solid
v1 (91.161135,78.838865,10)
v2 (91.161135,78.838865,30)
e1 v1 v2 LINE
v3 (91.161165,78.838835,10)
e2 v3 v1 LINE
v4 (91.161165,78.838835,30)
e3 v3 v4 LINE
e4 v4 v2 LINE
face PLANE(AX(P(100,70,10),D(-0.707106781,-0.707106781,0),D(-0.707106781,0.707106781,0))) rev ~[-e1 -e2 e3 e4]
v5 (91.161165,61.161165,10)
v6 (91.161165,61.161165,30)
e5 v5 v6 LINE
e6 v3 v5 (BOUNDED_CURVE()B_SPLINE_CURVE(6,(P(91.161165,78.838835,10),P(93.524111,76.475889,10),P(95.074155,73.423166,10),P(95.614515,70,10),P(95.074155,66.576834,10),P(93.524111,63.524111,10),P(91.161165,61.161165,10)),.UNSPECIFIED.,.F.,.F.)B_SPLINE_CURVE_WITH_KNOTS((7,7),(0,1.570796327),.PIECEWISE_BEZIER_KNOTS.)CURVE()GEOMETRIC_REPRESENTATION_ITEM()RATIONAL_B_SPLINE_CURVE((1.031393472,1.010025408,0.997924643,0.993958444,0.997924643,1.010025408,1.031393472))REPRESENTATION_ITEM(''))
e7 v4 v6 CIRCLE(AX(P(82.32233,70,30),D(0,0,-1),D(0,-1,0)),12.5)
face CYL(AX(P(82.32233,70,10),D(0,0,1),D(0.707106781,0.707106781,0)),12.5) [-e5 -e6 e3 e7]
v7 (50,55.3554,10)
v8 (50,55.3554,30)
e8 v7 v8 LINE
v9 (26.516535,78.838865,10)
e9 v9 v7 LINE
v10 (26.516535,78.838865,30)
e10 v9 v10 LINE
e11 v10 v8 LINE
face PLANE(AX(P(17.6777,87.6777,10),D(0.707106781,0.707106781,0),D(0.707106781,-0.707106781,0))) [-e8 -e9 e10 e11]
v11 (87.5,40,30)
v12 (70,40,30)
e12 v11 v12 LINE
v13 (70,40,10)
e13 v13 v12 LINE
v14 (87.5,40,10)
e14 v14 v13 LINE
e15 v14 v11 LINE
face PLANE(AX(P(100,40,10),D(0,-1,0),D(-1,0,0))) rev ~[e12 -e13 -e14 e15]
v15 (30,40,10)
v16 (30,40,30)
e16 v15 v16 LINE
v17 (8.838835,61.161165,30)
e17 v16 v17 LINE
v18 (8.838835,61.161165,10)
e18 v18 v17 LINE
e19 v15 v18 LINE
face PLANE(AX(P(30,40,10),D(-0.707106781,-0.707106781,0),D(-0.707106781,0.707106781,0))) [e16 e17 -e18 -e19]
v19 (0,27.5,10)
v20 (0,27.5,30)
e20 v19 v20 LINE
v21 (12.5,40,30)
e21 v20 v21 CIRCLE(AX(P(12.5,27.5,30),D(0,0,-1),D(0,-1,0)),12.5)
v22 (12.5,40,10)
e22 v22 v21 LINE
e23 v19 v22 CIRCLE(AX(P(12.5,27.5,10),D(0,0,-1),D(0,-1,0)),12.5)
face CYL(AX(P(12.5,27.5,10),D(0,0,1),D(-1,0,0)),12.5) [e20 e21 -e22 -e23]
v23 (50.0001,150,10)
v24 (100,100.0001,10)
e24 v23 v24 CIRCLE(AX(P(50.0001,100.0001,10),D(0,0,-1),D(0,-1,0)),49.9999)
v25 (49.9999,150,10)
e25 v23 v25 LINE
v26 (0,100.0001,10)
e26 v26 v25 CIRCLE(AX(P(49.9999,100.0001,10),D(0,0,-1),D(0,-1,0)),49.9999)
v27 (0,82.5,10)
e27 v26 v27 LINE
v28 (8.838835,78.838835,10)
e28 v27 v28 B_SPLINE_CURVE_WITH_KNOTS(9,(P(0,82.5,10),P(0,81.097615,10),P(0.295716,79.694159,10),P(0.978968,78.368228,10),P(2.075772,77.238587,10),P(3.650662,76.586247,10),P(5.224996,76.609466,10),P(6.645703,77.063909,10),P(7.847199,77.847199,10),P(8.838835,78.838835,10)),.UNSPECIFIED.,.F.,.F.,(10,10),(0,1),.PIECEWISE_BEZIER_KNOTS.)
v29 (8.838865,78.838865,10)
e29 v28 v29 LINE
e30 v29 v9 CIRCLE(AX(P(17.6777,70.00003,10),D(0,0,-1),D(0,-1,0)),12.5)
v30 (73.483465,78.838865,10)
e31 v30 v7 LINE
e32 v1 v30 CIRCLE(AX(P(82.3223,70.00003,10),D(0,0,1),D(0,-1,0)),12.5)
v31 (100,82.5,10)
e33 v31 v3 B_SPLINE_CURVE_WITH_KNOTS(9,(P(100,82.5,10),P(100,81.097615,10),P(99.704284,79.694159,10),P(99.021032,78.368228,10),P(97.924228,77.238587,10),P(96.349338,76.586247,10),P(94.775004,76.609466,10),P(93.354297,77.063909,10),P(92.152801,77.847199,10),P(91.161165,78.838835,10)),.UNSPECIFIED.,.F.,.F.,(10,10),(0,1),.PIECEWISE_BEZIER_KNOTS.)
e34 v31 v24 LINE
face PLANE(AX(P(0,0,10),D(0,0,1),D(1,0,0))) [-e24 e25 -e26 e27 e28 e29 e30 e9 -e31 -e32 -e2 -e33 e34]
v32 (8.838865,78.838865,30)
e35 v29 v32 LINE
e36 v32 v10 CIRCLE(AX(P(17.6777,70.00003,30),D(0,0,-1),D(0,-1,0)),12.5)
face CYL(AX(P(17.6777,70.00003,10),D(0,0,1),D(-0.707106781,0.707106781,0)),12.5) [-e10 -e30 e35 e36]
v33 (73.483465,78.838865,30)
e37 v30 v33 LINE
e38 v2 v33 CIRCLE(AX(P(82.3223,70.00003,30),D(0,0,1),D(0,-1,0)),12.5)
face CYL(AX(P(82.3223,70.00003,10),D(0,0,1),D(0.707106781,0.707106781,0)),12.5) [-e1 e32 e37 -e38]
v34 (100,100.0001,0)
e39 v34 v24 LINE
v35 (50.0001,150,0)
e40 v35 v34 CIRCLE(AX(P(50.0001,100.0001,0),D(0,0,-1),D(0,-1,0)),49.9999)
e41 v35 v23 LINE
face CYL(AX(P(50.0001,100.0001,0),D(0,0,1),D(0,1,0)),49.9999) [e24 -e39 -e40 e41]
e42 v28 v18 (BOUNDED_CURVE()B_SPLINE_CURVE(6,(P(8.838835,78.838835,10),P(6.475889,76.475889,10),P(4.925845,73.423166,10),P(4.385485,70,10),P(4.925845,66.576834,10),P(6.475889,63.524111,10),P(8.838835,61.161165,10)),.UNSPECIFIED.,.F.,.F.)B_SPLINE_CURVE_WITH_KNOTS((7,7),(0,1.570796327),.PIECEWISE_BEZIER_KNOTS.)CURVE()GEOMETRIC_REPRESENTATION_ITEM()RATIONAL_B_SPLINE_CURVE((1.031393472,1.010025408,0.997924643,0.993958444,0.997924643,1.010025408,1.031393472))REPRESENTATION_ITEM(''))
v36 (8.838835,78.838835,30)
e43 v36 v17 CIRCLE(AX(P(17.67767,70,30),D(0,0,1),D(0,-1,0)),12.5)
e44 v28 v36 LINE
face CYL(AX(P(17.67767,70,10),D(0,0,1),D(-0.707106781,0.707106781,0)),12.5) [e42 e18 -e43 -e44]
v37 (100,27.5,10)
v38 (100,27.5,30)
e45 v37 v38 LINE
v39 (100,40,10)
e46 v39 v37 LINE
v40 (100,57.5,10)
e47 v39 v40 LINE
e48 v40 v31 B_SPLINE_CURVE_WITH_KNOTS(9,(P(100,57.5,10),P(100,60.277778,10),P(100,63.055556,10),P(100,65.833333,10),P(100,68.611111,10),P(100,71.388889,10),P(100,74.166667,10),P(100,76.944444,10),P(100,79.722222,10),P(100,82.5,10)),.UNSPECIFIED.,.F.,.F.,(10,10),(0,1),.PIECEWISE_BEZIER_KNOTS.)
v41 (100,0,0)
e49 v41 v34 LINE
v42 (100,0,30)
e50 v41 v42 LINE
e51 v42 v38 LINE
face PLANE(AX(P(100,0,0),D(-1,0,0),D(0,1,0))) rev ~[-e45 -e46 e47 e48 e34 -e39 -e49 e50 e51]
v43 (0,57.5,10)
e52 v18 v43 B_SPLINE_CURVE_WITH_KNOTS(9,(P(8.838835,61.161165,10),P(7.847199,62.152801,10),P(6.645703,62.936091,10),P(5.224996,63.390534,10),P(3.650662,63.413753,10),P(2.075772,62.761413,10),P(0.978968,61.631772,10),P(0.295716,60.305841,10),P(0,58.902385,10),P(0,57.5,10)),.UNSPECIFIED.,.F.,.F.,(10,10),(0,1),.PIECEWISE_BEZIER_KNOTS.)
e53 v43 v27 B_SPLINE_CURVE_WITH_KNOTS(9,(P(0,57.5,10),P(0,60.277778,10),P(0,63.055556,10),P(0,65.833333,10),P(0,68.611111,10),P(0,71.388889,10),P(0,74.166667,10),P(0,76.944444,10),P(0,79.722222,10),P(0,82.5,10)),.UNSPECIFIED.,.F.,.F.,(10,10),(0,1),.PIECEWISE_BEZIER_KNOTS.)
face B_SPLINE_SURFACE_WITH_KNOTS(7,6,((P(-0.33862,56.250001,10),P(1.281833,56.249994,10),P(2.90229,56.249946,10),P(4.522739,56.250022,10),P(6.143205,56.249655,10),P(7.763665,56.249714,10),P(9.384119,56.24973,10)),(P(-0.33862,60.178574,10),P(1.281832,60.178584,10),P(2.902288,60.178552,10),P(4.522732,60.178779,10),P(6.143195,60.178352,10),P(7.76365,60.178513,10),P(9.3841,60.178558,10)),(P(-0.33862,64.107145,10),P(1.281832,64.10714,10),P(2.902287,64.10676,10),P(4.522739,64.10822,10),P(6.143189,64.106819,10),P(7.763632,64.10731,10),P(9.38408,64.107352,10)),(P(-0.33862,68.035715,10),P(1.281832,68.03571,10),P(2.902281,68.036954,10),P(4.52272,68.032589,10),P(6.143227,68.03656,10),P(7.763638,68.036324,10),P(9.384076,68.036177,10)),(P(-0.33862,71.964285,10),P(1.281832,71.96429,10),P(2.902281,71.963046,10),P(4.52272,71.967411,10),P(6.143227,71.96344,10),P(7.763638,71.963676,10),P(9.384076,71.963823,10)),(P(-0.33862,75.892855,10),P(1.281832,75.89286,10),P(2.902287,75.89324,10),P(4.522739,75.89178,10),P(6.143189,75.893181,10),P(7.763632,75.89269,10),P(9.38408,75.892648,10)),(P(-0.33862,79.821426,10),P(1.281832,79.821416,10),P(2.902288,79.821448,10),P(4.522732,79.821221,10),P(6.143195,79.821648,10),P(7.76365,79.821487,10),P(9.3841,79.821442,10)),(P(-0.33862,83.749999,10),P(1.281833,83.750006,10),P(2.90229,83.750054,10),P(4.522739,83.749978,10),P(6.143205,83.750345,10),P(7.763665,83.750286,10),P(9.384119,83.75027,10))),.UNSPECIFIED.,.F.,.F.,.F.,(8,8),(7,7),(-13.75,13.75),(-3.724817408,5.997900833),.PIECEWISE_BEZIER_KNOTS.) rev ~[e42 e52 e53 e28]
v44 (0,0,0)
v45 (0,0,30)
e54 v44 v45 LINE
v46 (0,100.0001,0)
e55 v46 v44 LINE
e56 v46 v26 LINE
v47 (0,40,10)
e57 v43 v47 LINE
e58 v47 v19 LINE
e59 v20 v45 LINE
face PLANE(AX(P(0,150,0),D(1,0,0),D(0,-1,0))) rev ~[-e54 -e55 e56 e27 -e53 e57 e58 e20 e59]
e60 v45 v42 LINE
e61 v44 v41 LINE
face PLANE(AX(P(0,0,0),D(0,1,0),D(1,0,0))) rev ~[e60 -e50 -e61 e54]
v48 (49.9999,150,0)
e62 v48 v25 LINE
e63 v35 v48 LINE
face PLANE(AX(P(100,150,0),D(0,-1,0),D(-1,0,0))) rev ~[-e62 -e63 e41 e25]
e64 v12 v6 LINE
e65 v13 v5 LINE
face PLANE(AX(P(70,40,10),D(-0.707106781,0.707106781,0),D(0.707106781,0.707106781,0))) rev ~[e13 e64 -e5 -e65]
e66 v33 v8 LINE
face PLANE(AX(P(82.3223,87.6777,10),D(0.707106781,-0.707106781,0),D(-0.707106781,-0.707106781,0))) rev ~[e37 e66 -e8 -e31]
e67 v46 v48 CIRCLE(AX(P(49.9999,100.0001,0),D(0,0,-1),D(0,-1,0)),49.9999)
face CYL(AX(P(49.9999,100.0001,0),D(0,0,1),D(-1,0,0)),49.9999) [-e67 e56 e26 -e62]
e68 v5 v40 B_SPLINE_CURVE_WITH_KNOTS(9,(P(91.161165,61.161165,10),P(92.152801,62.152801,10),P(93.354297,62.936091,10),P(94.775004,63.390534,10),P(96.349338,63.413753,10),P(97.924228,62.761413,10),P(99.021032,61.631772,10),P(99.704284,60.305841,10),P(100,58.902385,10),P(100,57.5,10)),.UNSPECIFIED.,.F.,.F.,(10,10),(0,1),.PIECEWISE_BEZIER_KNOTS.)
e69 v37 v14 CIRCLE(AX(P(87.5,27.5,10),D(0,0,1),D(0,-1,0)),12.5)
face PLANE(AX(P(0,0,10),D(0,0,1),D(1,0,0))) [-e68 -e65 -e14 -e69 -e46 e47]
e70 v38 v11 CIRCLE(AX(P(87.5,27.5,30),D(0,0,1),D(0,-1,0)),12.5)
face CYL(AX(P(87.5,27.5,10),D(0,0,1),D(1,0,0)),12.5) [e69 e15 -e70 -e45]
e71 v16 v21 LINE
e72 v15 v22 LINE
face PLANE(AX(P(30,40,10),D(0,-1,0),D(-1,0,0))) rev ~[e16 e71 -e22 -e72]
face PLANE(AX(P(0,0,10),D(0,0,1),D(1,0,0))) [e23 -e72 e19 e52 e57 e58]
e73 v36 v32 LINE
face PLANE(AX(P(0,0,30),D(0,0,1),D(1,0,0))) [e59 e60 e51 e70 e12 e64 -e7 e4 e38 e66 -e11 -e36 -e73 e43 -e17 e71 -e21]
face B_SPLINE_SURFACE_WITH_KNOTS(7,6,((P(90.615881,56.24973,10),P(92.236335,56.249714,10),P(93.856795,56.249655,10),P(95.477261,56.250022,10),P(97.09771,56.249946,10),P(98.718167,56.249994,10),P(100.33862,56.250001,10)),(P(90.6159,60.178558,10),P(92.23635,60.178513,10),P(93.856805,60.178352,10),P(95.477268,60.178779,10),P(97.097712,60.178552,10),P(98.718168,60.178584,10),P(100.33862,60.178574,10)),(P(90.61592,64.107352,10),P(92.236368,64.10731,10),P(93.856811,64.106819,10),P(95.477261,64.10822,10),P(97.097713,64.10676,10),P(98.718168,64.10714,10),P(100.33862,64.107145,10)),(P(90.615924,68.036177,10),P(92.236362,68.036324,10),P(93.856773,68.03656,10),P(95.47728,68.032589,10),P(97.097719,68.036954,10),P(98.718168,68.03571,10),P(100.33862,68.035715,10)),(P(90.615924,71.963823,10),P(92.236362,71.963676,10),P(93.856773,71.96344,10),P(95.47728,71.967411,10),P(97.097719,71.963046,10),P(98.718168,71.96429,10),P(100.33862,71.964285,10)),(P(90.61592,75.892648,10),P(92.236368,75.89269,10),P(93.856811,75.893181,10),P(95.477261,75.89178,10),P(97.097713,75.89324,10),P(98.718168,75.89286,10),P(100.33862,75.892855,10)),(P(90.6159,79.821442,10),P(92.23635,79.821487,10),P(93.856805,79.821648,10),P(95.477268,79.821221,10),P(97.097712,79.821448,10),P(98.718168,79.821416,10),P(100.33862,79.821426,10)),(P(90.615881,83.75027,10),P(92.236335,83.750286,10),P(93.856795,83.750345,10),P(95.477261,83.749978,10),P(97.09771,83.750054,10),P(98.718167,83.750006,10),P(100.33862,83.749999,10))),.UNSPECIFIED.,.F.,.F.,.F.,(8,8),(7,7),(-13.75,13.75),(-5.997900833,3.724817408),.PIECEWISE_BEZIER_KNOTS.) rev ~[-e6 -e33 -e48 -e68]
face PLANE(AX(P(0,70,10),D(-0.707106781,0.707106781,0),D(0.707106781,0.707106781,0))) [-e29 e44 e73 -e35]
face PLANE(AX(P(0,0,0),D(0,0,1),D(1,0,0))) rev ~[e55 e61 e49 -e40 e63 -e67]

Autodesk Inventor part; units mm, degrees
ref_plane "YZ Plane" through (0, 0, 0) normal (1, 0, 0) x (0, 1, 0)
ref_plane "XZ Plane" through (0, 0, 0) normal (0, 1, 0) x (-1, 0, 0)
ref_plane "XY Plane" through (0, 0, 0) normal (0, 0, 1) x (1, 0, 0)
sketch "Sketch9" plane through (0, 0, 0) normal (0, 0, 1) x (1, 0, 0)
  line L0 (0, 0) -> (100, 0)
  line L1 (100, 0) -> (100, 150)
  line L2 (100, 150) -> (0, 150)
  line L3 (0, 150) -> (0, 0)
  dimension "d68" = 100
  dimension "d69" = 150
extrude "Extrusion8" add sketch "Sketch9" along normal blind 10
sketch "Sketch10" plane through (0, 0, 10) normal (0, 0, 1) x (1, 0, 0)
  line L0 (0, 150) -> (0, 0) projected
  line L1 (0, 0) -> (100, 0)
  line L2 (100, 0) -> (100, 20)
  line L3 (100, 20) -> (0, 20)
  line L4 (0, 20) -> (0, 0)
  line L5 (50, 20) -> (0, 70)
  line L6 (0, 70) -> (17.6777, 87.6777)
  line L7 (17.6777, 87.6777) -> (67.6777, 37.6777)
  line L8 (67.6777, 37.6777) -> (50, 20)
  line L9 (50, 20) -> (120.7107, 20) construction
  line L10 (50, 20) -> (100, 70)
  line L11 (100, 70) -> (82.3223, 87.6777)
  line L12 (82.3223, 87.6777) -> (32.3223, 37.6777)
  line L13 (32.3223, 37.6777) -> (50, 20)
  line L14 (50, 20) -> (120.7107, 20) construction
  line L15 (0, 20) -> (100, 20)
  line L16 (100, 20) -> (100, 40)
  line L17 (100, 40) -> (0, 40)
  line L18 (0, 40) -> (0, 20)
  point P0 (70, 40)
  point P1 (65.3553, 40)
  point P2 (50, 55.3553)
  point P3 (30, 40)
  dimension "d72" = 100
  dimension "d73" = 20
  dimension "d74" = 135
  dimension "d75" = 25
  dimension "d76" = 45
  dimension "d77" = 25
  dimension "d78" = 20
extrude "Extrusion9" add sketch "Sketch10" along normal blind 20 contours L6 L7 L12 L17 L5 | L17 L5 L3 L0 | L17 L12 L5 | L3 L2 L1 L0 | L12 L17 L7 L8 L5 | L12 L7 L17 | L12 L11 L10 L17 L7 | L8 L10 L17 L16 L3 | L17 L10 L7
fillet "Fillet8" radius 50 2 edges at (0, 150, 5) (100, 150, 5)
fillet "Fillet9" radius 12.5 6 edges at (17.6777, 87.6777, 20) (0, 70, 20) (82.3223, 87.6777, 20) (100, 70, 20) (0, 40, 20) (100, 40, 20)
properties part number "Marker Holder 90 deg"
